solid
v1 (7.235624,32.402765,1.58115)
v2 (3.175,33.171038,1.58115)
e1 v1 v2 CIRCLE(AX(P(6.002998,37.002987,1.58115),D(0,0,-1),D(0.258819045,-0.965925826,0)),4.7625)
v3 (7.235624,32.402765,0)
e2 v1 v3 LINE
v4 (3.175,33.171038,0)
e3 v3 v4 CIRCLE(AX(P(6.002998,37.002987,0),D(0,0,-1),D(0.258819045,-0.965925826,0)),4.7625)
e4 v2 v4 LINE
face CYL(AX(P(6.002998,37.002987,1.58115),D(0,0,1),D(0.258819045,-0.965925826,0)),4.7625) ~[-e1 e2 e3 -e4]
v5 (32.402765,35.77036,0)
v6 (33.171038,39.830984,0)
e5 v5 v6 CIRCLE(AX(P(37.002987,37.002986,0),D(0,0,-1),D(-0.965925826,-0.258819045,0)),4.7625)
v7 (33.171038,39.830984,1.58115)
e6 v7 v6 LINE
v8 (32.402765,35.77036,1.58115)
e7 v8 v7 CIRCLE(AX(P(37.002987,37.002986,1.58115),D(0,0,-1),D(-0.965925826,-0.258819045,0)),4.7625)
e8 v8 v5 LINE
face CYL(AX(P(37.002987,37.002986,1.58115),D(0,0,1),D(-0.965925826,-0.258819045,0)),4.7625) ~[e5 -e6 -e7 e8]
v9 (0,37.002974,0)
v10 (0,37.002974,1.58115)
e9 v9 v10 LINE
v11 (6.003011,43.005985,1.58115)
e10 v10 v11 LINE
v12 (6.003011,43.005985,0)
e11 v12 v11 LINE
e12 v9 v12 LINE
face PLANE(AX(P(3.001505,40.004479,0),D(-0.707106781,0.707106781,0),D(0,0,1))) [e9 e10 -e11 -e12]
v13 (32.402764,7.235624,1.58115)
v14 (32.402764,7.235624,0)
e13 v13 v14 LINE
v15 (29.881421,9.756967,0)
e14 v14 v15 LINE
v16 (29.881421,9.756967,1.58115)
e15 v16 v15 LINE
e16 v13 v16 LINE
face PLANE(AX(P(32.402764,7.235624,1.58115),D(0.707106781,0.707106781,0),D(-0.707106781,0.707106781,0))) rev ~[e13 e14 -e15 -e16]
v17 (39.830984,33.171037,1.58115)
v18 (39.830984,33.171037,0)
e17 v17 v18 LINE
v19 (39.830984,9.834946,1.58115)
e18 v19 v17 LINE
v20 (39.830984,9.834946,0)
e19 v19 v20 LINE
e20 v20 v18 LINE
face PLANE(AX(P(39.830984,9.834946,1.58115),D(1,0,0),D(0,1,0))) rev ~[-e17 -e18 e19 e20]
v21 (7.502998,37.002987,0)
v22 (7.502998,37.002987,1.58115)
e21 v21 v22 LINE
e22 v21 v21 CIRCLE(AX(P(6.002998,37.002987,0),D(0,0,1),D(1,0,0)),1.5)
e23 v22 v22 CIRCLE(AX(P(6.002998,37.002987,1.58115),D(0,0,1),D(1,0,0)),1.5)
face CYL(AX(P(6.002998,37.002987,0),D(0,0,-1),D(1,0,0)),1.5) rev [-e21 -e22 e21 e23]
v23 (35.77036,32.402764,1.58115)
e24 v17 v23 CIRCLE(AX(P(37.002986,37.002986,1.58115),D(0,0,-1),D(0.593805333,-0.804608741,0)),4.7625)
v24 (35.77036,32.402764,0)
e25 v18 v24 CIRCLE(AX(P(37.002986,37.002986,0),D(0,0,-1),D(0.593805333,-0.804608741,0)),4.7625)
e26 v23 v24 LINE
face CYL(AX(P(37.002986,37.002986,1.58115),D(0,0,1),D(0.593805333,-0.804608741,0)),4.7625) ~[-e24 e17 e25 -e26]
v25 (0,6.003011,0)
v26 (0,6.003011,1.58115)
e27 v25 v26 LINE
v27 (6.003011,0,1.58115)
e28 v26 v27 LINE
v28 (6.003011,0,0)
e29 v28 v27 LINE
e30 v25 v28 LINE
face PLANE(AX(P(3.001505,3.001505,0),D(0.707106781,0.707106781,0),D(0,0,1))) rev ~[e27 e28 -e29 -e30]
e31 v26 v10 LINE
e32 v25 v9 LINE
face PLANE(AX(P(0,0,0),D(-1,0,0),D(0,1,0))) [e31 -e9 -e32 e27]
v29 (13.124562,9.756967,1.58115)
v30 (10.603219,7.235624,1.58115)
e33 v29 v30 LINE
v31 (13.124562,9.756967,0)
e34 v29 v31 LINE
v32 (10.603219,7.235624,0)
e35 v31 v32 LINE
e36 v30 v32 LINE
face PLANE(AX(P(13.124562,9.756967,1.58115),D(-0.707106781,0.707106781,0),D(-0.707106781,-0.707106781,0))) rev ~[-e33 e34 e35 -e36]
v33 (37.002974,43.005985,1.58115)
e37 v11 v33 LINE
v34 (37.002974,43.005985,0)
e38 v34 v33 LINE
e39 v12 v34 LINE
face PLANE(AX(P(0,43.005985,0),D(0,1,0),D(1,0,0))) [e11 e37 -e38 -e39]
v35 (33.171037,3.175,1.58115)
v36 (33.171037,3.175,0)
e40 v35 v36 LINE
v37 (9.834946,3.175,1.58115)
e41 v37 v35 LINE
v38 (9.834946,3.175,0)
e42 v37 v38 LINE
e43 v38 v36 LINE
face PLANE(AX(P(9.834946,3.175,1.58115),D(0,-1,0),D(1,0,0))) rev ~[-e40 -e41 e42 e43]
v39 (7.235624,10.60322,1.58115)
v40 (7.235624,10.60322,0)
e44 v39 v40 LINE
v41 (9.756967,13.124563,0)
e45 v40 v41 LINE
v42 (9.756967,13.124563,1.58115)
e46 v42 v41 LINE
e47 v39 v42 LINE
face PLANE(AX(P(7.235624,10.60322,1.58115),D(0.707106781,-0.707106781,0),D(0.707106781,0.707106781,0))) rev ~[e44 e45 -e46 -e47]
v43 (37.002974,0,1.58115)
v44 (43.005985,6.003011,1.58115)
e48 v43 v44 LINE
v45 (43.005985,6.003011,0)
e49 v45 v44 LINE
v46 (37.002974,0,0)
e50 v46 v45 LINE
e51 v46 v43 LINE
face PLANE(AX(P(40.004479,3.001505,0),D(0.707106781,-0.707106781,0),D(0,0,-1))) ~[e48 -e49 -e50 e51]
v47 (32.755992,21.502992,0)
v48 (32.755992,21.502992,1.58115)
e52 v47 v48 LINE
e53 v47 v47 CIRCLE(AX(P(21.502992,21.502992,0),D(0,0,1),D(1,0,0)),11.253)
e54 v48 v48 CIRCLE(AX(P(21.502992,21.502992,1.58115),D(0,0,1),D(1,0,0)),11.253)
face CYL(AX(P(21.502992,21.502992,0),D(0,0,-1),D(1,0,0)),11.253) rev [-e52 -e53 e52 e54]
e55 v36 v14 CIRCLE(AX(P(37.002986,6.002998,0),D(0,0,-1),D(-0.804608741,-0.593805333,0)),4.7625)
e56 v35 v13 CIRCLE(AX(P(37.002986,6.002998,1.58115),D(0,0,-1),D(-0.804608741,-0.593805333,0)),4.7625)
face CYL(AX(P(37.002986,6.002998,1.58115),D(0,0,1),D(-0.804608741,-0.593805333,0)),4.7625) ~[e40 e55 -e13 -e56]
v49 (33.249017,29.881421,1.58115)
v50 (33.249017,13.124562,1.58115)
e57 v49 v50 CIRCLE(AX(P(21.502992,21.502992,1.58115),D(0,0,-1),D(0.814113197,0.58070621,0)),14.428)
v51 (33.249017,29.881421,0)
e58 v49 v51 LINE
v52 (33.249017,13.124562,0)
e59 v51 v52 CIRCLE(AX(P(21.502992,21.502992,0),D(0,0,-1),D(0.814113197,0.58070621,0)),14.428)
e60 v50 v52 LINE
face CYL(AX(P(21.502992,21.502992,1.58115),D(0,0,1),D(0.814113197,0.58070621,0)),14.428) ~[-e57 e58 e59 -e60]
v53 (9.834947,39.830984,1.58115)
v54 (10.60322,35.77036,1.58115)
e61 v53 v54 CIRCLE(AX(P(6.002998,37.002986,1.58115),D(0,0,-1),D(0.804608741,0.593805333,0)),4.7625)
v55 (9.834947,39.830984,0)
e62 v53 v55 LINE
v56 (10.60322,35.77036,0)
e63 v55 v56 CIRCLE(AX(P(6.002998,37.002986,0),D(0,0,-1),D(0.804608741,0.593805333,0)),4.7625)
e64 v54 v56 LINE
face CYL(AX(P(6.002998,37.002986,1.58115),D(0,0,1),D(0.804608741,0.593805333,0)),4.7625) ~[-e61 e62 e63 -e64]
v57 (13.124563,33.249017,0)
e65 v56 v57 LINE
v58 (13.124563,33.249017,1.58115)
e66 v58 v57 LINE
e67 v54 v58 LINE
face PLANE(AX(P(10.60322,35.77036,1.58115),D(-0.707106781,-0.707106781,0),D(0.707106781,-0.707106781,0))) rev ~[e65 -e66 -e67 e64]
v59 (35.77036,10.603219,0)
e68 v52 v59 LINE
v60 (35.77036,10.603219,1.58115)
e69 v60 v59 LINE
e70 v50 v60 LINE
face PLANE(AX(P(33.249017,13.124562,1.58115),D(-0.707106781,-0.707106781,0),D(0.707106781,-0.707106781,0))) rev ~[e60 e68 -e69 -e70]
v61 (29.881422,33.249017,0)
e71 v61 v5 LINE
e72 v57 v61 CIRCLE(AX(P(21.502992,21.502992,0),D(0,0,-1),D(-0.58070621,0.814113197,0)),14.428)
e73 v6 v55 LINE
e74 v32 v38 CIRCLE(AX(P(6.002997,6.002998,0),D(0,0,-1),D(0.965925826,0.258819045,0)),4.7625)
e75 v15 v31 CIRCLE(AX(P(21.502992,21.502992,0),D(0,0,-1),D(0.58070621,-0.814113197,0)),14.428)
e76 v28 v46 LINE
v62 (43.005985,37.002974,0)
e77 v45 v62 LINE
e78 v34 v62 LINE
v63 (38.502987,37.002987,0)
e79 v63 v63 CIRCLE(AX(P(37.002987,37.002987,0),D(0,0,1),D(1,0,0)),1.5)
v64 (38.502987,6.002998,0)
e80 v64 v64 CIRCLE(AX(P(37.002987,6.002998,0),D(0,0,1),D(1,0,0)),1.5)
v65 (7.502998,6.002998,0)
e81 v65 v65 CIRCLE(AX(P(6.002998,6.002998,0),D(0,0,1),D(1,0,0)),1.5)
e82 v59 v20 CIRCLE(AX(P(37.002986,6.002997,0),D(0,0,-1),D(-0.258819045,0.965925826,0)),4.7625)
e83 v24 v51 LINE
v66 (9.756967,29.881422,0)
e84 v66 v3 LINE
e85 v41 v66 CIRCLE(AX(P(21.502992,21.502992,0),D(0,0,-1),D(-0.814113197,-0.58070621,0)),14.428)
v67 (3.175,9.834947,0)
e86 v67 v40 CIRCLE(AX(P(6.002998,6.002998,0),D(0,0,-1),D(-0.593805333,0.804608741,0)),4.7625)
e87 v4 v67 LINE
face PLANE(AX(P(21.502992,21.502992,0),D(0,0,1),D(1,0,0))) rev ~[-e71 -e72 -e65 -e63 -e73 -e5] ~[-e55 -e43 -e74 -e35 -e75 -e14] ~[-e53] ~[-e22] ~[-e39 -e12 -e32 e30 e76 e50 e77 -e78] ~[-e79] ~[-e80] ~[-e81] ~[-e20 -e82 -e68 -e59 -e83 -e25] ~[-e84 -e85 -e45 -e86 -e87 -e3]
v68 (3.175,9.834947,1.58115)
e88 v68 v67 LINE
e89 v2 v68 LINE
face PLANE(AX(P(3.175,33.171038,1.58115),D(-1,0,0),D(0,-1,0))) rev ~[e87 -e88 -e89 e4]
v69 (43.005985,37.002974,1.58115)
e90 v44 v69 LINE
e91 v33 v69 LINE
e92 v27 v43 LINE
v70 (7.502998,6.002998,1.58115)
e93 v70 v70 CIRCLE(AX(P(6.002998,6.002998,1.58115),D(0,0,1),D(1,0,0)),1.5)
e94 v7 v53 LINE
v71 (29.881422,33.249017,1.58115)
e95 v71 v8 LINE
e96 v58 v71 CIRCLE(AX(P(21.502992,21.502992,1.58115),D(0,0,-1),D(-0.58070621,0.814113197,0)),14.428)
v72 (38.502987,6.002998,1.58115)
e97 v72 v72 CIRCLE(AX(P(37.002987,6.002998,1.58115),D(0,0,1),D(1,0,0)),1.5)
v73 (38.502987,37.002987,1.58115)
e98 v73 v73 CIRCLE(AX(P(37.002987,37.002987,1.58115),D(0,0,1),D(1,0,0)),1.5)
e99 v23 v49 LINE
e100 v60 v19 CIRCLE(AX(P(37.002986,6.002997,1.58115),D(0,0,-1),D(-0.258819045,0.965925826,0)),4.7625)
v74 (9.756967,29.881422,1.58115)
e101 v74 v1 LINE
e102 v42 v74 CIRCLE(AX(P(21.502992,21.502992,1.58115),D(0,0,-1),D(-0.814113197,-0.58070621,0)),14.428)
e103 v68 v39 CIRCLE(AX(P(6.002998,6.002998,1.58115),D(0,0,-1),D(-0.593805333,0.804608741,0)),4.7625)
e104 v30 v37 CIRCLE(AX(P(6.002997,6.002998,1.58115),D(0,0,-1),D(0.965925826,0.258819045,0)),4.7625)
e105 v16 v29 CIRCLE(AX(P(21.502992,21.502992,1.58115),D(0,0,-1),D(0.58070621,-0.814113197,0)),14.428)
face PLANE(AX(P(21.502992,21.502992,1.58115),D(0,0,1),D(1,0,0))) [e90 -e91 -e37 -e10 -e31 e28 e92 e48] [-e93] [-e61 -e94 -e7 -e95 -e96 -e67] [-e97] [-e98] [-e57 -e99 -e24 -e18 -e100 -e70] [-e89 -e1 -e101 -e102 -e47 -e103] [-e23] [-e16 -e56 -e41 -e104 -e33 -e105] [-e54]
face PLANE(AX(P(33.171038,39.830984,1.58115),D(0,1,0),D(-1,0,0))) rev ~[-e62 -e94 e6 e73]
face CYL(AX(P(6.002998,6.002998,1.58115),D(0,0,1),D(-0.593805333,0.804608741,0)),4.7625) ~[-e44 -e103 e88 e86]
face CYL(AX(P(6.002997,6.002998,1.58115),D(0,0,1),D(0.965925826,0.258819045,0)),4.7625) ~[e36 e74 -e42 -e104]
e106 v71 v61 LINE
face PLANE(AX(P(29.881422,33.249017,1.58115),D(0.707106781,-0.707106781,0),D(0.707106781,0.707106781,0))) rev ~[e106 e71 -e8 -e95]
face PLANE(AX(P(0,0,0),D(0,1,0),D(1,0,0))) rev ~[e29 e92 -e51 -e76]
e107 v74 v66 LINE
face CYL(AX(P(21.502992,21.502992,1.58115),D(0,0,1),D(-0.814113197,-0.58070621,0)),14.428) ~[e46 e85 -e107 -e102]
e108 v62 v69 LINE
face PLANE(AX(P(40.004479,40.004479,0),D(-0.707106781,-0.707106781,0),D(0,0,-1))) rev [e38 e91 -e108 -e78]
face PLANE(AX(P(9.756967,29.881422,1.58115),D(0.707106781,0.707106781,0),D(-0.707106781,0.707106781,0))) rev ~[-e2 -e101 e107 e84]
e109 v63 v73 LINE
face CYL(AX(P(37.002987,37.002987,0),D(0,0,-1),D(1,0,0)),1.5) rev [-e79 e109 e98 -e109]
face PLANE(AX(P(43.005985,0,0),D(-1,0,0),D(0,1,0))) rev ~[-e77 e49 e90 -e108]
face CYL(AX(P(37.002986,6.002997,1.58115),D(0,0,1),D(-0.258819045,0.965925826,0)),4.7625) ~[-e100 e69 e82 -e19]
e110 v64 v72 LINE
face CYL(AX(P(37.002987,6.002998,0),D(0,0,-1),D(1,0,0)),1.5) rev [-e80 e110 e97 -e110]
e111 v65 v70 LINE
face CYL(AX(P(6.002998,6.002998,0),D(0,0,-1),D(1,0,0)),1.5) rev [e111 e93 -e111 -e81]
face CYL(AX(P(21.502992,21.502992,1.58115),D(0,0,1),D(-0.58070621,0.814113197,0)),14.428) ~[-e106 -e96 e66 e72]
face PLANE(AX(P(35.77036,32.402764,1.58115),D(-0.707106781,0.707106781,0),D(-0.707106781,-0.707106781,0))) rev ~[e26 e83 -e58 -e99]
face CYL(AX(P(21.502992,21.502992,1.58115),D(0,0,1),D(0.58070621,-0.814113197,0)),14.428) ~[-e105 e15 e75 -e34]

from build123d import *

# Parameters (mm, degrees)
F0_W            = 43.0059846
F0_H            = 43.0059846
F0_R            = 1.5
F0_R_2          = 11.2530001
F1_DEPTH        = 1.58115
F2_SIZE         = 6.0030106
F4_DEPTH        = 1.58115
F4_COPIES_COUNT = 4


# Not quite as in the source:
# - a pattern or mirror of a feature is missing from the dataset's text; its kind, count and spacing are read off the source's solid


with BuildPart() as f1:
    # F0 (on Top) → F1 (new body)
    with BuildSketch(Plane.XY):
        with Locations((21.5029923, 21.5029923)):
            Rectangle(F0_W, F0_H)
        with Locations((6.0029979, 6.0029979)):
            Circle(F0_R, mode=Mode.SUBTRACT)
        with Locations((21.5029923, 21.5029923)):
            Circle(F0_R_2, mode=Mode.SUBTRACT)
        with Locations((37.0029867, 6.0029979)):
            Circle(F0_R, mode=Mode.SUBTRACT)
        with Locations((6.0029979, 37.0029867)):
            Circle(F0_R, mode=Mode.SUBTRACT)
        with Locations((37.0029867, 37.0029867)):
            Circle(F0_R, mode=Mode.SUBTRACT)
    extrude(amount=F1_DEPTH)

    # F2
    f2_edges = [f1.edges().sort_by_distance(p)[0] for p in [
        (0, 0, 0.790575),
        (0, 43.005985, 0.790575),
        (43.005985, 0, 0.790575),
        (43.005985, 43.005985, 0.790575),
    ]]
    chamfer(f2_edges, length=F2_SIZE)

    # F3 (on face) → F4 (cut, through all)
    with BuildSketch(Plane.XY.offset(1.58115)):
        with BuildLine():
            ThreePointArc((7.2356236023, 32.4027649523), (5.1176370603, 32.3235056996), (3.175, 33.171037571))
            Line((3.175, 33.171037571), (3.175, 9.834947029))
            ThreePointArc((3.175, 9.834947029), (5.1176370603, 10.6824789004), (7.2356236023, 10.6032196477))
            Line((7.2356236023, 10.6032196477), (9.7569670059, 13.1245630513))
            ThreePointArc((9.7569670059, 13.1245630513), (7.0749922, 21.5029923), (9.7569670059, 29.8814215487))
            Line((9.7569670059, 29.8814215487), (7.2356236023, 32.4027649523))
        make_face()
    f4 = extrude(amount=-F4_DEPTH, mode=Mode.SUBTRACT)

    # F4_copies: F4 ×4 about axis
    f4_copies_axis = Axis((21.502992, 21.502992, 0), (0, 0, 1))
    for i in range(1, F4_COPIES_COUNT):
        add(f4.rotate(f4_copies_axis, i * 360 / F4_COPIES_COUNT), mode=Mode.SUBTRACT)


solid = f1.part
